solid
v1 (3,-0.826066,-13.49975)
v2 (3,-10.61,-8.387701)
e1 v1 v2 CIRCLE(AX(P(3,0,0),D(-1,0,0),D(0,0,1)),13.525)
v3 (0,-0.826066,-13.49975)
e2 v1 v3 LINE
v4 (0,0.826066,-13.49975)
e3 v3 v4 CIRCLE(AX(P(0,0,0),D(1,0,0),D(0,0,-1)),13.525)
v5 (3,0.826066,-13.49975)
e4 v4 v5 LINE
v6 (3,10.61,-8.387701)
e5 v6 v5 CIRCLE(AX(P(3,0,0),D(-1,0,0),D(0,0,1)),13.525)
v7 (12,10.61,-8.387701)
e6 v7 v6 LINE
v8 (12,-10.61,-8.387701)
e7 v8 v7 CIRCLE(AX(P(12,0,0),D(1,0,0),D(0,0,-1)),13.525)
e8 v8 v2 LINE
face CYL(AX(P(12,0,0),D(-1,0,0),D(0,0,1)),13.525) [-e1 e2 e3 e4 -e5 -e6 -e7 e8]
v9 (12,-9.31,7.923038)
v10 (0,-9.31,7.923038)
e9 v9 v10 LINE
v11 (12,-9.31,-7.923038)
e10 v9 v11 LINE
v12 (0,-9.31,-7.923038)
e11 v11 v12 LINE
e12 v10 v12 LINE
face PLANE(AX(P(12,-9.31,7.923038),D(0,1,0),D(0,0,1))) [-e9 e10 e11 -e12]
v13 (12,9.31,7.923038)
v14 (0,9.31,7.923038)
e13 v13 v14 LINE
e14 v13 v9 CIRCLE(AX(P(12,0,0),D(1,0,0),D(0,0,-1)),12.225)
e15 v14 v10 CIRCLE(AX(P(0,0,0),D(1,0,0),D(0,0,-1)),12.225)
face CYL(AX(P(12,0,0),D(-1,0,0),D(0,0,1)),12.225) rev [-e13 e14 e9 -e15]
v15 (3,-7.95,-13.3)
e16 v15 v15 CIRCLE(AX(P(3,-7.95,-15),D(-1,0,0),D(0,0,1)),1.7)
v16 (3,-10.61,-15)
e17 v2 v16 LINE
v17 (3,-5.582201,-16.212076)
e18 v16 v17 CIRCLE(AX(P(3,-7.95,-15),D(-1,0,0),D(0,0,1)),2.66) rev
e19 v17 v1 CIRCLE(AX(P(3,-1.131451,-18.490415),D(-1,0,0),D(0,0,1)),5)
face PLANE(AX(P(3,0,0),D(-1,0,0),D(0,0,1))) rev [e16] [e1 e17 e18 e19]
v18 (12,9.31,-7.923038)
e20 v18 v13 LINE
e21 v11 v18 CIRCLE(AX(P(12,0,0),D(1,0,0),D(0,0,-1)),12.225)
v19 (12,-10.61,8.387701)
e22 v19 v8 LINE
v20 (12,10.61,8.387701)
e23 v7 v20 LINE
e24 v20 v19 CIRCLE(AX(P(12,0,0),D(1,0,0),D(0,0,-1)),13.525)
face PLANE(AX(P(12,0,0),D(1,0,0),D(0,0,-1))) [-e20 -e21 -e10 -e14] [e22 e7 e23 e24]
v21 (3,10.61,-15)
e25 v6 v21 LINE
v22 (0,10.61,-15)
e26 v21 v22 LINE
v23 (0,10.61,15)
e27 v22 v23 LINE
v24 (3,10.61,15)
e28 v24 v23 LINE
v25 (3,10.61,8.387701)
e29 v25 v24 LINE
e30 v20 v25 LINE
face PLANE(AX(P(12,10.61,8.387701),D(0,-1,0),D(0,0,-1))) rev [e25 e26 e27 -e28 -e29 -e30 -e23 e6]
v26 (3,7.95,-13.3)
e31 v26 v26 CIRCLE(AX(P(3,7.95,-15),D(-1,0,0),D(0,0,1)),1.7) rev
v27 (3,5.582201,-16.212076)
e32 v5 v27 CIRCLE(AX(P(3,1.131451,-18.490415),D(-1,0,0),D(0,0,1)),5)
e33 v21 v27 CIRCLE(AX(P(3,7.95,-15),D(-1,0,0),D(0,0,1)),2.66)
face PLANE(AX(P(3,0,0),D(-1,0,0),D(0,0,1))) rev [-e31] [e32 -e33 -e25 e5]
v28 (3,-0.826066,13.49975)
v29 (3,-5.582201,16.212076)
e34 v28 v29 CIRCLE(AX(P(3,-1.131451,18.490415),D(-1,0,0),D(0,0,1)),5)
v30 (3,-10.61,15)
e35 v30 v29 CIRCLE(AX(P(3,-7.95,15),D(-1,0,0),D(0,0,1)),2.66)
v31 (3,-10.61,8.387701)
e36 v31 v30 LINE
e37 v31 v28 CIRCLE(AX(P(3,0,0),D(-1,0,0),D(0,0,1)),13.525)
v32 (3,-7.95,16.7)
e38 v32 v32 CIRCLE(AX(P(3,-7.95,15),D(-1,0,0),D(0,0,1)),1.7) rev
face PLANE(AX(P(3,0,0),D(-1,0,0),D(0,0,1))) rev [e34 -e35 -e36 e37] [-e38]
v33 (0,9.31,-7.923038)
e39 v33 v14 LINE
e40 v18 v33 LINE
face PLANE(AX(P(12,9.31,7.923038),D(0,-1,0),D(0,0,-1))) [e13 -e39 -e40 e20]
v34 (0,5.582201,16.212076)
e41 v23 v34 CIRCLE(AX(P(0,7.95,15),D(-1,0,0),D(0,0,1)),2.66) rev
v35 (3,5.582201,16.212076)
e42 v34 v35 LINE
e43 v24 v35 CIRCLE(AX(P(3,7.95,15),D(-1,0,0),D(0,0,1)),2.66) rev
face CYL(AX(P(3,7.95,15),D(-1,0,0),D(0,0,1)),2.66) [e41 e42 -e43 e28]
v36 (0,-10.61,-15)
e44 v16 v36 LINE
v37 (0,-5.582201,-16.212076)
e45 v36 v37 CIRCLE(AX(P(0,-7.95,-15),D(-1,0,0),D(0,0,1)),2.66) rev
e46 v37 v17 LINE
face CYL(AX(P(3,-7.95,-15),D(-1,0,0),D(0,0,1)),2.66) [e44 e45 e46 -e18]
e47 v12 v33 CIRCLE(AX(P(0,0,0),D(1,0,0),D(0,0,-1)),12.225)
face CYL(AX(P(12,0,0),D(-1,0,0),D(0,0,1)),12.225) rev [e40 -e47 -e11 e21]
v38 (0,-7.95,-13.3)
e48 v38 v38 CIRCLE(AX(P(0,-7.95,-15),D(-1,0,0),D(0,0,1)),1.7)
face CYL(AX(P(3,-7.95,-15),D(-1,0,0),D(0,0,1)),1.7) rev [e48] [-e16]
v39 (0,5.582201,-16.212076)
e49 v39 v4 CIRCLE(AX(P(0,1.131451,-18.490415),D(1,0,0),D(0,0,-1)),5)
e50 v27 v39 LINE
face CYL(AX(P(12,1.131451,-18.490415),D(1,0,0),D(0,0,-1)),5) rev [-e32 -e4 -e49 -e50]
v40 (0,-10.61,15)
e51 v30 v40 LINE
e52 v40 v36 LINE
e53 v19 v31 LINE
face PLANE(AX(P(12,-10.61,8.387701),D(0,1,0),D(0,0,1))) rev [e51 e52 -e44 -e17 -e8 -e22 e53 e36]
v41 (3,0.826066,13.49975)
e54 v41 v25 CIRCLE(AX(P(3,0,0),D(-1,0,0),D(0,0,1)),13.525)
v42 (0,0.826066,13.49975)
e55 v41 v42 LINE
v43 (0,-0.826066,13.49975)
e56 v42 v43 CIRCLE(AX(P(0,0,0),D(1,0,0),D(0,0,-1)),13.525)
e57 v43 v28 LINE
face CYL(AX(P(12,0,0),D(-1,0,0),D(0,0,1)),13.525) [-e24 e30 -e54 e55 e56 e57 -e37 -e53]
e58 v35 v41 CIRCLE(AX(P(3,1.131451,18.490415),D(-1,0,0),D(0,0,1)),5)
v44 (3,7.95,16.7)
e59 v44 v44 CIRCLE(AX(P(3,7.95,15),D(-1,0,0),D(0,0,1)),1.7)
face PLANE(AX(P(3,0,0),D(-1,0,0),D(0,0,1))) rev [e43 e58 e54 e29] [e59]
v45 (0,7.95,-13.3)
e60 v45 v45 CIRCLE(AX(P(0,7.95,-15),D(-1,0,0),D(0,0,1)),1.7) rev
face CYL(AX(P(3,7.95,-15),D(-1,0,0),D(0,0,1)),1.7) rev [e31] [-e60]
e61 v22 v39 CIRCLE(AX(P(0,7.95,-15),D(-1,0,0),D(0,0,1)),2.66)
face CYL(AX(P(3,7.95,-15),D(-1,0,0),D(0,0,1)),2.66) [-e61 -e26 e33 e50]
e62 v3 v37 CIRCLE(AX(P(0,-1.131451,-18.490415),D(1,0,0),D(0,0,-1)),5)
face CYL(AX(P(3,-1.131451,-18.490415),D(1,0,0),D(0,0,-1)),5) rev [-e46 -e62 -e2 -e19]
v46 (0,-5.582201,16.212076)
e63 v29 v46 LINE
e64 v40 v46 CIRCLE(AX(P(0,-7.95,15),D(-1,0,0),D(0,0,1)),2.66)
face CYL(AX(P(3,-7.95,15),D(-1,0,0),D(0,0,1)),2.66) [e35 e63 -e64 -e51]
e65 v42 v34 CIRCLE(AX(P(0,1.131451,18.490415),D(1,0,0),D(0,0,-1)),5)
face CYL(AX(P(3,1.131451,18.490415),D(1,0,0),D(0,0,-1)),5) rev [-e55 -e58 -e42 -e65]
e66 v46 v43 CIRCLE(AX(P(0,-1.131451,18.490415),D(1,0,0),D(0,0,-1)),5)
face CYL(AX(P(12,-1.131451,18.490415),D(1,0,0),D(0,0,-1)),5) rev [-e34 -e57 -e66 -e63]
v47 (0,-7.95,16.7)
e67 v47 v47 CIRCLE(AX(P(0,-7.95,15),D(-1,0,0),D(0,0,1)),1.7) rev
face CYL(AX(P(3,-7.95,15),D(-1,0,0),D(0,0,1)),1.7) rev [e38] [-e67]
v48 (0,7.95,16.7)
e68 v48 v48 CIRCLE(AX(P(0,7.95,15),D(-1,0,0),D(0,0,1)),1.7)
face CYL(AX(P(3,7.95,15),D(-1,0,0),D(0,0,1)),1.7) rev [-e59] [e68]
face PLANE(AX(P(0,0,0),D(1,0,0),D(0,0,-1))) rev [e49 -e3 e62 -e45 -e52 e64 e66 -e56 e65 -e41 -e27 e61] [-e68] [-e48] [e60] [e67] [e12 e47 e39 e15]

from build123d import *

# Parameters (mm, degrees)
MOTOR_HOLDER_DEPTH  = 12
SKETCH2_R           = 1.7
BOSS_EXTRUDE1_DEPTH = 3
FILLET1_R           = 5


with BuildPart() as part:
    # Sketch1 → Motor Holder (new body)
    with BuildSketch(Plane(origin=(0, 0, 0), x_dir=(0, 0, -1), z_dir=(1, 0, 0))):
        with BuildLine():
            Line((-8.387700817, 10.61), (8.387700817, 10.61))
            ThreePointArc((8.387700817, 10.61), (13.525, 0), (8.387700817, -10.61))
            Line((8.387700817, -10.61), (-8.387700817, -10.61))
            ThreePointArc((-8.387700817, -10.61), (-13.525, 0), (-8.387700817, 10.61))
        make_face()
        with BuildLine():
            Line((-7.923037612, 9.31), (7.923037612, 9.31))
            ThreePointArc((7.923037612, 9.31), (12.225, 0), (7.923037612, -9.31))
            Line((7.923037612, -9.31), (-7.923037612, -9.31))
            ThreePointArc((-7.923037612, -9.31), (-12.225, 0), (-7.923037612, 9.31))
        make_face(mode=Mode.SUBTRACT)
    extrude(amount=MOTOR_HOLDER_DEPTH)

    # Sketch2 → Boss-Extrude1 (add)
    # profile 1 of 4: a face of its own
    with BuildSketch(Plane.ZY):
        with BuildLine():
            Line((-15.86201317, 5.433547478), (-12.795120435, 4.382980497))
            ThreePointArc((-12.795120435, 4.382980497), (-11.039561677, 7.8136869), (-8.387700817, 10.61))
            Line((-8.387700817, 10.61), (-15, 10.61))
            ThreePointArc((-15, 10.61), (-17.623867728, 8.386941811), (-15.86201317, 5.433547478))
        make_face()
        with Locations((-15, 7.95)):
            Circle(SKETCH2_R, mode=Mode.SUBTRACT)
    # profile 2 of 4: a face of its own
    with BuildSketch(Plane.ZY):
        with BuildLine():
            Line((-15, -10.61), (-8.387700817, -10.61))
            ThreePointArc((-8.387700817, -10.61), (-11.039561677, -7.8136869), (-12.795120435, -4.382980497))
            Line((-12.795120435, -4.382980497), (-15.86201317, -5.433547478))
            ThreePointArc((-15.86201317, -5.433547478), (-17.623867728, -8.386941811), (-15, -10.61))
        make_face()
        with Locations((-15, -7.95)):
            Circle(SKETCH2_R, mode=Mode.SUBTRACT)
    # profile 3 of 4: a face of its own
    with BuildSketch(Plane.ZY):
        with BuildLine():
            Line((15.86201317, -5.433547478), (12.795120435, -4.382980497))
            ThreePointArc((12.795120435, -4.382980497), (11.039561677, -7.8136869), (8.387700817, -10.61))
            Line((8.387700817, -10.61), (15, -10.61))
            ThreePointArc((15, -10.61), (17.623867728, -8.386941811), (15.86201317, -5.433547478))
        make_face()
        with Locations((15, -7.95)):
            Circle(SKETCH2_R, mode=Mode.SUBTRACT)
    # profile 4 of 4: a face of its own
    with BuildSketch(Plane.ZY):
        with BuildLine():
            Line((15, 10.61), (8.387700817, 10.61))
            ThreePointArc((8.387700817, 10.61), (11.039561677, 7.8136869), (12.795120435, 4.382980497))
            Line((12.795120435, 4.382980497), (15.86201317, 5.433547478))
            ThreePointArc((15.86201317, 5.433547478), (17.623867728, 8.386941811), (15, 10.61))
        make_face()
        with Locations((15, 7.95)):
            Circle(SKETCH2_R, mode=Mode.SUBTRACT)
    extrude(amount=-BOSS_EXTRUDE1_DEPTH)

    # Fillet1
    # the kernel refuses this fillet: 5 mm, written as the material it adds along each edge
    with BuildSketch(Plane(origin=(0, -4.382980497, -12.795120435), x_dir=(0, -0.3311587269792296, -0.9435750619561202), z_dir=(1, 0, 0)), Plane(origin=(0, 4.382980497, 12.795120435), x_dir=(0, 0.3311587269792292, 0.9435750619561204), z_dir=(1, 0, 0))) as fillet1_piece_1:
        with BuildLine():
            CenterArc((4.297165601, 4.954108155), FILLET1_R, 195.837486713, 66.393727894)
            Line((-0.513032618, 3.589559476), (-0.99405244, 3.453104608))
            ThreePointArc((-0.99405244, 3.453104608), (-0.630646565, 1.74130771), (-0.499985908, -0.003753963))
            Line((-0.499985908, -0.003753963), (0.003753963, -0.499985908))
            ThreePointArc((0.003753963, -0.499985908), (3.245501889, -0.475646418), (3.553698727, -0.495410815))
            Line((3.553698727, -0.495410815), (3.621286625, 0))
        make_face()
    extrude(amount=3)
    with BuildSketch(Plane(origin=(0, 4.382980497, -12.795120435), x_dir=(0, 0.3311587269792287, -0.9435750619561205), z_dir=(1, 0, 0)), Plane(origin=(0, -4.382980497, 12.795120435), x_dir=(0, -0.3311587269792296, 0.9435750619561202), z_dir=(1, 0, 0))) as fillet1_piece_2:
        with BuildLine():
            CenterArc((4.297165601, -4.954108155), FILLET1_R, 97.768785393, 66.393727894)
            Line((-0.513032618, -3.589559476), (-0.99405244, -3.453104608))
            ThreePointArc((-0.99405244, -3.453104608), (-0.630646565, -1.74130771), (-0.499985908, 0.003753963))
            Line((-0.499985908, 0.003753963), (0.003753963, 0.499985908))
            ThreePointArc((0.003753963, 0.499985908), (3.245501889, 0.475646418), (3.553698727, 0.495410815))
            Line((3.553698727, 0.495410815), (3.621286625, 0))
        make_face()
    extrude(amount=3)


solid = part.part
